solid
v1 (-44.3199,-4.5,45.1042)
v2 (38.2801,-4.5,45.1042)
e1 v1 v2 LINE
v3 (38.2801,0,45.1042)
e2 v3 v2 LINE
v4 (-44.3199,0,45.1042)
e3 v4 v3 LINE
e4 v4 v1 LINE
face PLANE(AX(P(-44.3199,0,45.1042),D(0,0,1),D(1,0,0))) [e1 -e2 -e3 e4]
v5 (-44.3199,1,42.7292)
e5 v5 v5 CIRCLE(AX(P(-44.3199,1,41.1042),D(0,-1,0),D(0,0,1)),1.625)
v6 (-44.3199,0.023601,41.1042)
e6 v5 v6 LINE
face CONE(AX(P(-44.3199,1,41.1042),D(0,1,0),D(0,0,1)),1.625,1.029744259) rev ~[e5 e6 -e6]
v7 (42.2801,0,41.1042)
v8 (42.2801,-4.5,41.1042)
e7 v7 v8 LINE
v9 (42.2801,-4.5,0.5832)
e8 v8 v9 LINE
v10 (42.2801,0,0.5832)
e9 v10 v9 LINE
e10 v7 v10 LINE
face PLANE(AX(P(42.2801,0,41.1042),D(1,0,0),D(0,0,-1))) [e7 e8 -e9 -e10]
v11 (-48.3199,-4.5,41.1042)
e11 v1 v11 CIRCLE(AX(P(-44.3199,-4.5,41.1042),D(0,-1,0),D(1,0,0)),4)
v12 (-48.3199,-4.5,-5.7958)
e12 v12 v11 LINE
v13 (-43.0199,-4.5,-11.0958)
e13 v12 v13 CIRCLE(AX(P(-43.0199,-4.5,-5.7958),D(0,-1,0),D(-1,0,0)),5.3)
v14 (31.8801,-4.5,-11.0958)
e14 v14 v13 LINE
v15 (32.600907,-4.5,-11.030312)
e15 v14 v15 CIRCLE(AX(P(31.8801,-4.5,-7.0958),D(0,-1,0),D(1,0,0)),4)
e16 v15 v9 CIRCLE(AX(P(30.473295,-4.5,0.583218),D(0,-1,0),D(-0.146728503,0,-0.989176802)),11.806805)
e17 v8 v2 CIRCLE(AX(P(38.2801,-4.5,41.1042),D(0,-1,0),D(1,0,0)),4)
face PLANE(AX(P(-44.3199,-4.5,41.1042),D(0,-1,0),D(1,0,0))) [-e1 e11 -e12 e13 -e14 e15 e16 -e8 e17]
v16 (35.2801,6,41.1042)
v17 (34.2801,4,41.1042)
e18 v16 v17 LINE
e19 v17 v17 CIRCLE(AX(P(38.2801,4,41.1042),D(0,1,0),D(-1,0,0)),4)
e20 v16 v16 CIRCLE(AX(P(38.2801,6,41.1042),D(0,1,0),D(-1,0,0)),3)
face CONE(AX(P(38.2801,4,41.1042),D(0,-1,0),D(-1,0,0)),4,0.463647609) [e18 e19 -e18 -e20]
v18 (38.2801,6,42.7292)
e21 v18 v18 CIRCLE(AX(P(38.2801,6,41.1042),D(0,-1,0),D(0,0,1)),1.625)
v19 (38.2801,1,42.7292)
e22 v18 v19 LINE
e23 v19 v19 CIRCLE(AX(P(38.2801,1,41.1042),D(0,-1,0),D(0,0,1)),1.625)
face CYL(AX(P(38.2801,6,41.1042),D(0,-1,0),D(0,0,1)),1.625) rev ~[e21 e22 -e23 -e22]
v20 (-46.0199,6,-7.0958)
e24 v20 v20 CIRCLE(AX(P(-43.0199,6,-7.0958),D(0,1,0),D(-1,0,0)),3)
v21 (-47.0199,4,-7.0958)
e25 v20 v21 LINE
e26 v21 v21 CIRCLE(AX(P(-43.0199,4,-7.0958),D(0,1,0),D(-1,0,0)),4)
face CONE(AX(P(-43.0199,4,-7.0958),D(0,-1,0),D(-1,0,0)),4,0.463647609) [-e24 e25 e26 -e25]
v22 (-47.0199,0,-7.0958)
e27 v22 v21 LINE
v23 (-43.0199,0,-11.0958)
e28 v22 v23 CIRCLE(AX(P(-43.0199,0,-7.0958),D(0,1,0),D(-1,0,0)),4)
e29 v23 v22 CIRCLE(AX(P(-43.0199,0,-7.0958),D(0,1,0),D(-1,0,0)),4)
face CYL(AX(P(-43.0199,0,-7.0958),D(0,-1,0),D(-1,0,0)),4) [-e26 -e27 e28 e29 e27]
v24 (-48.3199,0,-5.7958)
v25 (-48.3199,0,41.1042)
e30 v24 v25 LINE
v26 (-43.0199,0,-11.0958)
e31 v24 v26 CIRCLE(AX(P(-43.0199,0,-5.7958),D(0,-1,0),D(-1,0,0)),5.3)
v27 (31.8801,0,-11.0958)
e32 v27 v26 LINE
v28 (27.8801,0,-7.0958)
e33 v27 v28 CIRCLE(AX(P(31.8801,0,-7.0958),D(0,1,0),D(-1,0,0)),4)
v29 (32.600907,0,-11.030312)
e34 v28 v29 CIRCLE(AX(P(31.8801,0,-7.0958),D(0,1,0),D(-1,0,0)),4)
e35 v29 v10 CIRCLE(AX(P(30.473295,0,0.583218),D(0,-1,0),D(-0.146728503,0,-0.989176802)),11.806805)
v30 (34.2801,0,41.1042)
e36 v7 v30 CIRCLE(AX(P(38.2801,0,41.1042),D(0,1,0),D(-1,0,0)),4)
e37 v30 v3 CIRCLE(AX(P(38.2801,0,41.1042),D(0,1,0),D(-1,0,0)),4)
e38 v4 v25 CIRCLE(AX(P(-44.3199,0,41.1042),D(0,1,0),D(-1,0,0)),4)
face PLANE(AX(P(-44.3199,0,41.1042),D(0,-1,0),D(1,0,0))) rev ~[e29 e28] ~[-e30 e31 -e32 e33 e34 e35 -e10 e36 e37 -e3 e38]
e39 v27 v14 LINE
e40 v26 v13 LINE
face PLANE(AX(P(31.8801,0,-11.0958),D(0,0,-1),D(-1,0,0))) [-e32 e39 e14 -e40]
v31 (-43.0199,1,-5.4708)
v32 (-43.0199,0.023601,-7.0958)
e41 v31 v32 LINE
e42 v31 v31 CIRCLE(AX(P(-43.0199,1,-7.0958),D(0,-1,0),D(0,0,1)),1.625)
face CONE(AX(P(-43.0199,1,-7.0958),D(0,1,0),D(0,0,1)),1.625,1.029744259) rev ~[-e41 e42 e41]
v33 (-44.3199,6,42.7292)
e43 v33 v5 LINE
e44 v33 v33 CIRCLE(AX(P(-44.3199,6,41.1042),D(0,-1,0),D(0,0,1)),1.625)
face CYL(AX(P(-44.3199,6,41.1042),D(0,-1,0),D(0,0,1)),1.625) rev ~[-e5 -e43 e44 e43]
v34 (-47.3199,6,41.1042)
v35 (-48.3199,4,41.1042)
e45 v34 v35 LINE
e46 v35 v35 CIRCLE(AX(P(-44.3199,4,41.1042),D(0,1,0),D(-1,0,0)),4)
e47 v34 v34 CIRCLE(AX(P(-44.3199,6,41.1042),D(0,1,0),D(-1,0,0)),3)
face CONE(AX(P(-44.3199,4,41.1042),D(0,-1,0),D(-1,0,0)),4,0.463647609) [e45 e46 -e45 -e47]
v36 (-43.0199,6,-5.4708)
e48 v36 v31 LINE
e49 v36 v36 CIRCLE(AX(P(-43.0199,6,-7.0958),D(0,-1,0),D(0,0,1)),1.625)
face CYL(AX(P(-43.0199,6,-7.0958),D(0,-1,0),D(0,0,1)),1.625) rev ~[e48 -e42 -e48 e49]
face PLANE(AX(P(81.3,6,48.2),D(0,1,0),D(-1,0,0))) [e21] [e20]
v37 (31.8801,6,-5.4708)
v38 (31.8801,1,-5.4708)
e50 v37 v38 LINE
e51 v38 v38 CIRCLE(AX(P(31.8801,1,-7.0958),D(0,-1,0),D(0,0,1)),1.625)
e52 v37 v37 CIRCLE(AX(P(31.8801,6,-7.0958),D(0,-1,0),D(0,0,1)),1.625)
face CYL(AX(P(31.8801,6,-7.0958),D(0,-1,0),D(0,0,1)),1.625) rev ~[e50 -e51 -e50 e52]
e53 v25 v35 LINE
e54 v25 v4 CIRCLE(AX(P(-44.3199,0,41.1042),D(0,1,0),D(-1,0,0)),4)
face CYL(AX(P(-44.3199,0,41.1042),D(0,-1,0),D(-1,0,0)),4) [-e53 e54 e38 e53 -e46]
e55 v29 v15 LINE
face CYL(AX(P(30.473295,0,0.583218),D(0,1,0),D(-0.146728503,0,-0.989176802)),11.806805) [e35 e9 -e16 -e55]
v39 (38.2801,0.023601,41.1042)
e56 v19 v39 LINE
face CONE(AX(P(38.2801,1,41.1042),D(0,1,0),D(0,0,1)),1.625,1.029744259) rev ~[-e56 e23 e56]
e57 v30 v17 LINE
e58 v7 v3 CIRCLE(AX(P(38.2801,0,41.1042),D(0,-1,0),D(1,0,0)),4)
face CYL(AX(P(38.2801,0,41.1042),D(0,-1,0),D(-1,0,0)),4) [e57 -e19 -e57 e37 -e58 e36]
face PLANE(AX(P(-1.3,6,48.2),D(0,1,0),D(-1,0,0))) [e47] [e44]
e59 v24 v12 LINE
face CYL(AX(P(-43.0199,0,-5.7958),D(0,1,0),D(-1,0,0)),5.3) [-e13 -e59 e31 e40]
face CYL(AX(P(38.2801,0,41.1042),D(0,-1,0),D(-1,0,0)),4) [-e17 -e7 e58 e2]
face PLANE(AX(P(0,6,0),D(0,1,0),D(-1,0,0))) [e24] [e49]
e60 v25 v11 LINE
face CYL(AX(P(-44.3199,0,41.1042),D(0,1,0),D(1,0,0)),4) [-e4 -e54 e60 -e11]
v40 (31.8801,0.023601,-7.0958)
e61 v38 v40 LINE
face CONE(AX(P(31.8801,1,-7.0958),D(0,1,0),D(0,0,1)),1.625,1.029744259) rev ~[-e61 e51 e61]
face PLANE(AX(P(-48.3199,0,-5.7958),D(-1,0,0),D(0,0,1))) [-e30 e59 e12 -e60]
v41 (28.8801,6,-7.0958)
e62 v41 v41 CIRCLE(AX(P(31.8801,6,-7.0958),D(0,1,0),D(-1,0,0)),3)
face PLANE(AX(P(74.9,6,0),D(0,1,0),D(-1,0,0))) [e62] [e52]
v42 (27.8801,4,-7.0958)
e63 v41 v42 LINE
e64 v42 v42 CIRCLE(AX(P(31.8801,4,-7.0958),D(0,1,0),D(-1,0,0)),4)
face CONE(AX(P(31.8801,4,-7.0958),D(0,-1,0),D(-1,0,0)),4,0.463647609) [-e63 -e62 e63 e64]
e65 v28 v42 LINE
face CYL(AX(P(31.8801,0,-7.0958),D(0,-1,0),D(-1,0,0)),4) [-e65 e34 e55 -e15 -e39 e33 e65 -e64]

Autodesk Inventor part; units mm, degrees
ref_plane "YZ Plane" through (0, 0, 0) normal (1, 0, 0) x (0, 1, 0)
ref_plane "XZ Plane" through (0, 0, 0) normal (0, 1, 0) x (-1, 0, 0)
ref_plane "XY Plane" through (0, 0, 0) normal (0, 0, 1) x (1, 0, 0)
sketch "Arduino Hole Layout" plane through (0, 0, 0) normal (0, 1, 0) x (-1, 0, 0)
  circle A0 centre (43.0199, -7.0958) radius 1.55 construction
  circle A1 centre (-31.8801, -7.0958) radius 1.55 construction
  circle A2 centre (44.3199, 41.1042) radius 1.55 construction
  circle A3 centre (-38.2801, 41.1042) radius 1.55 construction
  line L0 (58.8879, -10.055) -> (-40.7911, -10.055) construction
  line L1 (-40.7911, -10.055) -> (-40.7911, 44.0634) construction
  line L2 (-40.7911, 44.0634) -> (58.8879, 44.0634) construction
  line L3 (58.8879, 44.0634) -> (58.8879, -10.055) construction
  line L4 (43.0199, -7.0958) -> (43.0199, -10.055) construction
  line L5 (44.3199, 41.1042) -> (44.3199, 44.0634) construction
  dimension "d0" = 3.1
  dimension "d1" = 74.9
  dimension "d2" = 1.3
  dimension "d3" = 48.2
  dimension "d5" = 82.6
  dimension "d9" = 15.868
  dimension "d10" = 54.1184
  dimension "d11" = 99.679
sketch "Sketch13" plane through (0, 0, 0) normal (0, 1, 0) x (-1, 0, 0)
  circle A0 centre (43.0199, -7.0958) radius 1.55 construction
  circle A1 centre (43.0199, -7.0958) radius 4
  point P0 (0, 0)
  point P1 (-38.2801, 41.1042)
  point P2 (-31.8801, -7.0958)
  point P3 (-38.2801, 41.1042)
  point P4 (44.3199, 41.1042)
  dimension "d48" = 8
extrude "Extrusion10" add sketch "Sketch13" along normal blind 6
sketch "Sketch14" plane through (-43.0199, 6, -7.0958) normal (0, 1, 0) x (1, 0, 0)
  circle A0 centre (0, 0) radius 4 construction
  point P0 (43.0199, -7.0958)
  point P1 (81.3, -48.2)
  point P2 (-1.3, -48.2)
  point P3 (74.9, 0)
  point P4 (81.3, -48.2)
  point P5 (-1.3, -48.2)
hole "Hole2" at (-43.0199, 6, -7.0958) direction (0, -1, 0) diameter 3.25 depth 5 tip angle 118
chamfer "Chamfer2" distance 1 distance2 2 1 edges at (-39.0199, 6, -7.0958) measured on face at (-46.1856, 6, -7.4802)
pattern_sketch "Sketch Driven Pattern1" from (-43.0199, 0, -7.0958) copies at (-44.3199, 0, 41.1042) at (31.8801, 0, -7.0958) at (38.2801, 0, 41.1042)
sketch "Sketch16" plane through (-44.3199, 0, 41.1042) normal (0, -1, 0) x (1, 0, 0)
  line L0 (-4, 4) -> (86.6, 4)
  line L1 (86.6, 4) -> (86.6, -52.2)
  line L2 (86.6, -52.2) -> (-4, -52.2)
  line L3 (-4, -52.2) -> (-4, 4)
  circle A0 centre (0, 0) radius 4 projected
  circle A1 centre (82.6, 0) radius 4 projected
  circle A2 centre (1.3, -48.2) radius 4 projected
  arc A3 (-4, -46.9) -> (1.3, -52.2) centre (1.3, -46.9) ccw
  arc A4 (73.0608, -52.2) -> (86.6, -40.521) centre (74.7932, -40.521) ccw
  circle A5 centre (76.2, -48.2) radius 4 projected
  point P0 (44.3199, -41.1042)
  point P1 (76.9208, -52.1345)
  point P2 (86.6, 0)
  point P3 (82.6, 4)
  point P4 (0, 4)
  point P5 (-4, 0)
  point P6 (76.2, -52.2)
extrude "Extrusion12" add sketch "Sketch16" along normal blind 4.5 contours A2 | L0 A1 L1 A4 A5 L2 A3 L3 A0 | A0 | A1 | A5
properties part number "arduino_mega_standoffs_plate"
